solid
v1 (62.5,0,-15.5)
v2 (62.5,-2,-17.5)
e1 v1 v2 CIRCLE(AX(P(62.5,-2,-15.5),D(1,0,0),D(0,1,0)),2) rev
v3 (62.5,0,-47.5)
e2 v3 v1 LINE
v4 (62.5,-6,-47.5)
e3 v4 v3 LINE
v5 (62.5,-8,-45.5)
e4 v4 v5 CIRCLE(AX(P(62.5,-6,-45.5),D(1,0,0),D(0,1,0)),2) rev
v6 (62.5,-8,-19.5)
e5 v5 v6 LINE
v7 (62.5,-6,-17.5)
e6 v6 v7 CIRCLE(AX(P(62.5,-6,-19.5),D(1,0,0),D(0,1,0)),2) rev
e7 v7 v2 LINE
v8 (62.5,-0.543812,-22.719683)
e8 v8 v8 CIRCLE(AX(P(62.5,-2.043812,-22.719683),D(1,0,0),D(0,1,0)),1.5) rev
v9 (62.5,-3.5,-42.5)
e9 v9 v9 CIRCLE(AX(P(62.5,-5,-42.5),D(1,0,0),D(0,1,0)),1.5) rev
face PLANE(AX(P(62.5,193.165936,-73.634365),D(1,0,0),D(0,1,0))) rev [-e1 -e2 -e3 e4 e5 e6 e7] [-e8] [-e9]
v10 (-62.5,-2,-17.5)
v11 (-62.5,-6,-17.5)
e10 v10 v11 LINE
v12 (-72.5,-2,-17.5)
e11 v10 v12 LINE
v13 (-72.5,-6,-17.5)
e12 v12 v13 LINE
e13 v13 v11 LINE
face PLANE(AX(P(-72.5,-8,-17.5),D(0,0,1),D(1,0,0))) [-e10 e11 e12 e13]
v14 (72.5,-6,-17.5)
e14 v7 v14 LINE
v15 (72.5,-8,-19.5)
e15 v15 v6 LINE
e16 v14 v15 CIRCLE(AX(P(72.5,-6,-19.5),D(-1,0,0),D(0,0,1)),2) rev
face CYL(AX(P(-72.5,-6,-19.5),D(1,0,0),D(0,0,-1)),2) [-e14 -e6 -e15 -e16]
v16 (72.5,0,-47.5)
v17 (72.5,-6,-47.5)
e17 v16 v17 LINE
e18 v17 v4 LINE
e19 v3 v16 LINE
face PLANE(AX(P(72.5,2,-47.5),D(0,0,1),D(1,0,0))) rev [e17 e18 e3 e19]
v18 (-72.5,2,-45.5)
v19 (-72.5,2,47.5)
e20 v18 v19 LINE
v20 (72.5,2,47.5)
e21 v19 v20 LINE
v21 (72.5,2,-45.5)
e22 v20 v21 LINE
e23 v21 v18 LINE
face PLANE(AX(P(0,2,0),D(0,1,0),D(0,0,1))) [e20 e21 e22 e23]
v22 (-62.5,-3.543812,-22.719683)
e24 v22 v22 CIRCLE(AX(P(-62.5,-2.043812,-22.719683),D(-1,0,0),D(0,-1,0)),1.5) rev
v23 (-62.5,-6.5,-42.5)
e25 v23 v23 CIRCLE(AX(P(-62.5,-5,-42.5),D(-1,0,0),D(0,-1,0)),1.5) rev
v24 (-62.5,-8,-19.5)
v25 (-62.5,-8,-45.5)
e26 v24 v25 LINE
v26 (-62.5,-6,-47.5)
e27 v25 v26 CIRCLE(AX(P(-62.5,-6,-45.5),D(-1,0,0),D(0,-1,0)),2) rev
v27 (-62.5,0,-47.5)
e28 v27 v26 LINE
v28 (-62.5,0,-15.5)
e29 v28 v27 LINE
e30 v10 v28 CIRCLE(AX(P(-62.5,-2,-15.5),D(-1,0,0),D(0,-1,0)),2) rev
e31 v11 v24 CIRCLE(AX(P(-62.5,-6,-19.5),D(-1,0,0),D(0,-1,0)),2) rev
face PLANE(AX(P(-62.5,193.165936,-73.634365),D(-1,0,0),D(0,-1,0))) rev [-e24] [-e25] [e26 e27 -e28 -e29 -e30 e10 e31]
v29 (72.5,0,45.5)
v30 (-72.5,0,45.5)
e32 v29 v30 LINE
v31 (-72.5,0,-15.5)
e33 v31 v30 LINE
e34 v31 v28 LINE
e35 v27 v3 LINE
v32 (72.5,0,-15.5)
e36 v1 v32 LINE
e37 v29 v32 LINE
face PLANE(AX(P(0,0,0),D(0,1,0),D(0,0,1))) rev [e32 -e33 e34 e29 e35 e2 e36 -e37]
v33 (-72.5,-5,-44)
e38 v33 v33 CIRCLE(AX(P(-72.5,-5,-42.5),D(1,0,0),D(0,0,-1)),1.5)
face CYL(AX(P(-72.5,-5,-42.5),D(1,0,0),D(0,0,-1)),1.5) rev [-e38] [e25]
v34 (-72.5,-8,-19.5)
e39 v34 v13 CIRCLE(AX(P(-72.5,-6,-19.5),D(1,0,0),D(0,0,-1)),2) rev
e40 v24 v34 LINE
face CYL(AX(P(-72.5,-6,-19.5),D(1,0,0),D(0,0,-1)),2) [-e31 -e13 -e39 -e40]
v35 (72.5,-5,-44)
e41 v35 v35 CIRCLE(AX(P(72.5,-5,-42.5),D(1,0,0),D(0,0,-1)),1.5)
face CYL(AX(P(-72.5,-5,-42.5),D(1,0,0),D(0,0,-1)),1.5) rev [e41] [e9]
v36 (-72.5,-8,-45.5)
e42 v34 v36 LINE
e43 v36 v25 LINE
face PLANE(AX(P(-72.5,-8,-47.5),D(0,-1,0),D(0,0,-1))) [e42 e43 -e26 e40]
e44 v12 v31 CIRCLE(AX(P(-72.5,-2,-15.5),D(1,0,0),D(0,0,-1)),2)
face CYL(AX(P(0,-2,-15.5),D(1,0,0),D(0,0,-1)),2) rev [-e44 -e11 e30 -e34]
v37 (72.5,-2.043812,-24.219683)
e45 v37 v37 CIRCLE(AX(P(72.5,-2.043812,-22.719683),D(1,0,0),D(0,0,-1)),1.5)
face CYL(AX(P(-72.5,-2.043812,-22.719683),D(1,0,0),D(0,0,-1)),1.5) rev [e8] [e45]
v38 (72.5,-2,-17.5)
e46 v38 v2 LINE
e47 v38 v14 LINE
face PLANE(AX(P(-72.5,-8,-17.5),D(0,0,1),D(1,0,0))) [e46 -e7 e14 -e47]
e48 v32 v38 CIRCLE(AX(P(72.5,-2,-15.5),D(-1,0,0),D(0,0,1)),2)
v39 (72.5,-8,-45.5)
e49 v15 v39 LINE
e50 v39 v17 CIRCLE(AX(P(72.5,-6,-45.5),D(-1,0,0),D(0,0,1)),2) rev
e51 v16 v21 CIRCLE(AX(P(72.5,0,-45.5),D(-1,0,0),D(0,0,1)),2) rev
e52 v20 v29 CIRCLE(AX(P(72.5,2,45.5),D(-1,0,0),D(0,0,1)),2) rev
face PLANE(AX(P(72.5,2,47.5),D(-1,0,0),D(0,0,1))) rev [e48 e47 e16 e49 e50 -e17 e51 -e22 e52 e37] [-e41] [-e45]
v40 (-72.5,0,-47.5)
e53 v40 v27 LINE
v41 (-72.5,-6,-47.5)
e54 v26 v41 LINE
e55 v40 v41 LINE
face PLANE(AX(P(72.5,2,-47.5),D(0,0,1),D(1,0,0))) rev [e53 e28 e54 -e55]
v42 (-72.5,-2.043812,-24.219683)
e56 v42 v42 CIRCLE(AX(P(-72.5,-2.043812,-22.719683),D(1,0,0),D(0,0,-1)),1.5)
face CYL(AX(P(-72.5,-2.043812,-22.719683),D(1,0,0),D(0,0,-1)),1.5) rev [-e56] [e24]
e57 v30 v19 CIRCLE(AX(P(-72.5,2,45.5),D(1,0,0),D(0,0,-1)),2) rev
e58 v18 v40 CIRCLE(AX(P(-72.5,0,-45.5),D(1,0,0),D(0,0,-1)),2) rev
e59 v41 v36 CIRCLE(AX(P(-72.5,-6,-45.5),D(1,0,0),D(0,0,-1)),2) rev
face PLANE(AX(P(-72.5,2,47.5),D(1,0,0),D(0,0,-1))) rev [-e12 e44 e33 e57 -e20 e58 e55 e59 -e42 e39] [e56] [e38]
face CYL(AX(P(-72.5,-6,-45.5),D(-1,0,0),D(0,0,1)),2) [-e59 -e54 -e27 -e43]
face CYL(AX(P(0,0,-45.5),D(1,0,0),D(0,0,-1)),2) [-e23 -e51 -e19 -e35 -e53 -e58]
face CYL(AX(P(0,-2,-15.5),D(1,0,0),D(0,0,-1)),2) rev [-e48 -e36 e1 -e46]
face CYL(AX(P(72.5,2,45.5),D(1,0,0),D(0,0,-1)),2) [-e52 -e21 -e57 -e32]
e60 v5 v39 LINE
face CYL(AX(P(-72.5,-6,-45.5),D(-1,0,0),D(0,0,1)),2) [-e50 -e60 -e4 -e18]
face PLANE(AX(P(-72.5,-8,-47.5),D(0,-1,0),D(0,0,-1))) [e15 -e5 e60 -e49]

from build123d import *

# Parameters (mm, degrees)
SKETCH_1_W          = 145
SKETCH_1_H          = 95
EXTRUDE_1_DEPTH     = 2
SKETCH_2_W          = 30
SKETCH_2_H          = 8
SKETCH_2_R          = 1.5
EXTRUDE_2_DEPTH     = 145
FILLET_1_R          = 2
CUT_EXTRUDE_2_REACH = 89.25
SKETCH_3_W          = 125
SKETCH_3_H          = 147.268730198


with BuildPart() as part:
    # 草图1 → 凸台-拉伸1 (new body)
    with BuildSketch(Plane(origin=(0, 0, 0), x_dir=(1, 0, 0), z_dir=(0, 1, 0))):
        Rectangle(SKETCH_1_W, SKETCH_1_H)
    extrude(amount=EXTRUDE_1_DEPTH)

    # 草图2 → 凸台-拉伸2 (add, through all)
    with BuildSketch(Plane(origin=(72.5, 0, 0), x_dir=(0, 0, -1), z_dir=(1, 0, 0))):
        with Locations((32.5, -4)):
            Rectangle(SKETCH_2_W, SKETCH_2_H)
        with Locations((22.719682733, -2.043811777)):
            Circle(SKETCH_2_R, mode=Mode.SUBTRACT)
        with Locations((42.5, -5)):
            Circle(SKETCH_2_R, mode=Mode.SUBTRACT)
    extrude(amount=-EXTRUDE_2_DEPTH)

    # 圆角1
    fillet_1_edges = [part.edges().sort_by_distance(p)[0] for p in [
        (0, 2, -47.5),
        (0, -8, -47.5),
        (0, -8, -17.5),
        (0, 0, -17.5),
        (0, 0, 47.5),
    ]]
    fillet(fillet_1_edges, radius=FILLET_1_R - 0.0001)  # a hair under: the kernel refuses the full size

    # 切除-拉伸2: up to this face of the body (flat: up to its plane)
    cut_extrude_2_end = Plane(part.part.faces().sort_by_distance((0, 0, 15))[0])
    # 草图3 → 切除-拉伸2 (cut, up to the picked face)
    with BuildSketch(Plane.XZ.offset(8), mode=Mode.PRIVATE) as cut_extrude_2_sk1:
        Rectangle(SKETCH_3_W, SKETCH_3_H)
    cut_extrude_2_tool1 = split(extrude(cut_extrude_2_sk1.sketch, amount=-CUT_EXTRUDE_2_REACH, mode=Mode.PRIVATE), bisect_by=cut_extrude_2_end, keep=Keep.BOTH, mode=Mode.PRIVATE)
    add(cut_extrude_2_tool1.solids().sort_by(Axis((0, -8, 0), (0, 1, 0)))[0], mode=Mode.SUBTRACT)


solid = part.part
